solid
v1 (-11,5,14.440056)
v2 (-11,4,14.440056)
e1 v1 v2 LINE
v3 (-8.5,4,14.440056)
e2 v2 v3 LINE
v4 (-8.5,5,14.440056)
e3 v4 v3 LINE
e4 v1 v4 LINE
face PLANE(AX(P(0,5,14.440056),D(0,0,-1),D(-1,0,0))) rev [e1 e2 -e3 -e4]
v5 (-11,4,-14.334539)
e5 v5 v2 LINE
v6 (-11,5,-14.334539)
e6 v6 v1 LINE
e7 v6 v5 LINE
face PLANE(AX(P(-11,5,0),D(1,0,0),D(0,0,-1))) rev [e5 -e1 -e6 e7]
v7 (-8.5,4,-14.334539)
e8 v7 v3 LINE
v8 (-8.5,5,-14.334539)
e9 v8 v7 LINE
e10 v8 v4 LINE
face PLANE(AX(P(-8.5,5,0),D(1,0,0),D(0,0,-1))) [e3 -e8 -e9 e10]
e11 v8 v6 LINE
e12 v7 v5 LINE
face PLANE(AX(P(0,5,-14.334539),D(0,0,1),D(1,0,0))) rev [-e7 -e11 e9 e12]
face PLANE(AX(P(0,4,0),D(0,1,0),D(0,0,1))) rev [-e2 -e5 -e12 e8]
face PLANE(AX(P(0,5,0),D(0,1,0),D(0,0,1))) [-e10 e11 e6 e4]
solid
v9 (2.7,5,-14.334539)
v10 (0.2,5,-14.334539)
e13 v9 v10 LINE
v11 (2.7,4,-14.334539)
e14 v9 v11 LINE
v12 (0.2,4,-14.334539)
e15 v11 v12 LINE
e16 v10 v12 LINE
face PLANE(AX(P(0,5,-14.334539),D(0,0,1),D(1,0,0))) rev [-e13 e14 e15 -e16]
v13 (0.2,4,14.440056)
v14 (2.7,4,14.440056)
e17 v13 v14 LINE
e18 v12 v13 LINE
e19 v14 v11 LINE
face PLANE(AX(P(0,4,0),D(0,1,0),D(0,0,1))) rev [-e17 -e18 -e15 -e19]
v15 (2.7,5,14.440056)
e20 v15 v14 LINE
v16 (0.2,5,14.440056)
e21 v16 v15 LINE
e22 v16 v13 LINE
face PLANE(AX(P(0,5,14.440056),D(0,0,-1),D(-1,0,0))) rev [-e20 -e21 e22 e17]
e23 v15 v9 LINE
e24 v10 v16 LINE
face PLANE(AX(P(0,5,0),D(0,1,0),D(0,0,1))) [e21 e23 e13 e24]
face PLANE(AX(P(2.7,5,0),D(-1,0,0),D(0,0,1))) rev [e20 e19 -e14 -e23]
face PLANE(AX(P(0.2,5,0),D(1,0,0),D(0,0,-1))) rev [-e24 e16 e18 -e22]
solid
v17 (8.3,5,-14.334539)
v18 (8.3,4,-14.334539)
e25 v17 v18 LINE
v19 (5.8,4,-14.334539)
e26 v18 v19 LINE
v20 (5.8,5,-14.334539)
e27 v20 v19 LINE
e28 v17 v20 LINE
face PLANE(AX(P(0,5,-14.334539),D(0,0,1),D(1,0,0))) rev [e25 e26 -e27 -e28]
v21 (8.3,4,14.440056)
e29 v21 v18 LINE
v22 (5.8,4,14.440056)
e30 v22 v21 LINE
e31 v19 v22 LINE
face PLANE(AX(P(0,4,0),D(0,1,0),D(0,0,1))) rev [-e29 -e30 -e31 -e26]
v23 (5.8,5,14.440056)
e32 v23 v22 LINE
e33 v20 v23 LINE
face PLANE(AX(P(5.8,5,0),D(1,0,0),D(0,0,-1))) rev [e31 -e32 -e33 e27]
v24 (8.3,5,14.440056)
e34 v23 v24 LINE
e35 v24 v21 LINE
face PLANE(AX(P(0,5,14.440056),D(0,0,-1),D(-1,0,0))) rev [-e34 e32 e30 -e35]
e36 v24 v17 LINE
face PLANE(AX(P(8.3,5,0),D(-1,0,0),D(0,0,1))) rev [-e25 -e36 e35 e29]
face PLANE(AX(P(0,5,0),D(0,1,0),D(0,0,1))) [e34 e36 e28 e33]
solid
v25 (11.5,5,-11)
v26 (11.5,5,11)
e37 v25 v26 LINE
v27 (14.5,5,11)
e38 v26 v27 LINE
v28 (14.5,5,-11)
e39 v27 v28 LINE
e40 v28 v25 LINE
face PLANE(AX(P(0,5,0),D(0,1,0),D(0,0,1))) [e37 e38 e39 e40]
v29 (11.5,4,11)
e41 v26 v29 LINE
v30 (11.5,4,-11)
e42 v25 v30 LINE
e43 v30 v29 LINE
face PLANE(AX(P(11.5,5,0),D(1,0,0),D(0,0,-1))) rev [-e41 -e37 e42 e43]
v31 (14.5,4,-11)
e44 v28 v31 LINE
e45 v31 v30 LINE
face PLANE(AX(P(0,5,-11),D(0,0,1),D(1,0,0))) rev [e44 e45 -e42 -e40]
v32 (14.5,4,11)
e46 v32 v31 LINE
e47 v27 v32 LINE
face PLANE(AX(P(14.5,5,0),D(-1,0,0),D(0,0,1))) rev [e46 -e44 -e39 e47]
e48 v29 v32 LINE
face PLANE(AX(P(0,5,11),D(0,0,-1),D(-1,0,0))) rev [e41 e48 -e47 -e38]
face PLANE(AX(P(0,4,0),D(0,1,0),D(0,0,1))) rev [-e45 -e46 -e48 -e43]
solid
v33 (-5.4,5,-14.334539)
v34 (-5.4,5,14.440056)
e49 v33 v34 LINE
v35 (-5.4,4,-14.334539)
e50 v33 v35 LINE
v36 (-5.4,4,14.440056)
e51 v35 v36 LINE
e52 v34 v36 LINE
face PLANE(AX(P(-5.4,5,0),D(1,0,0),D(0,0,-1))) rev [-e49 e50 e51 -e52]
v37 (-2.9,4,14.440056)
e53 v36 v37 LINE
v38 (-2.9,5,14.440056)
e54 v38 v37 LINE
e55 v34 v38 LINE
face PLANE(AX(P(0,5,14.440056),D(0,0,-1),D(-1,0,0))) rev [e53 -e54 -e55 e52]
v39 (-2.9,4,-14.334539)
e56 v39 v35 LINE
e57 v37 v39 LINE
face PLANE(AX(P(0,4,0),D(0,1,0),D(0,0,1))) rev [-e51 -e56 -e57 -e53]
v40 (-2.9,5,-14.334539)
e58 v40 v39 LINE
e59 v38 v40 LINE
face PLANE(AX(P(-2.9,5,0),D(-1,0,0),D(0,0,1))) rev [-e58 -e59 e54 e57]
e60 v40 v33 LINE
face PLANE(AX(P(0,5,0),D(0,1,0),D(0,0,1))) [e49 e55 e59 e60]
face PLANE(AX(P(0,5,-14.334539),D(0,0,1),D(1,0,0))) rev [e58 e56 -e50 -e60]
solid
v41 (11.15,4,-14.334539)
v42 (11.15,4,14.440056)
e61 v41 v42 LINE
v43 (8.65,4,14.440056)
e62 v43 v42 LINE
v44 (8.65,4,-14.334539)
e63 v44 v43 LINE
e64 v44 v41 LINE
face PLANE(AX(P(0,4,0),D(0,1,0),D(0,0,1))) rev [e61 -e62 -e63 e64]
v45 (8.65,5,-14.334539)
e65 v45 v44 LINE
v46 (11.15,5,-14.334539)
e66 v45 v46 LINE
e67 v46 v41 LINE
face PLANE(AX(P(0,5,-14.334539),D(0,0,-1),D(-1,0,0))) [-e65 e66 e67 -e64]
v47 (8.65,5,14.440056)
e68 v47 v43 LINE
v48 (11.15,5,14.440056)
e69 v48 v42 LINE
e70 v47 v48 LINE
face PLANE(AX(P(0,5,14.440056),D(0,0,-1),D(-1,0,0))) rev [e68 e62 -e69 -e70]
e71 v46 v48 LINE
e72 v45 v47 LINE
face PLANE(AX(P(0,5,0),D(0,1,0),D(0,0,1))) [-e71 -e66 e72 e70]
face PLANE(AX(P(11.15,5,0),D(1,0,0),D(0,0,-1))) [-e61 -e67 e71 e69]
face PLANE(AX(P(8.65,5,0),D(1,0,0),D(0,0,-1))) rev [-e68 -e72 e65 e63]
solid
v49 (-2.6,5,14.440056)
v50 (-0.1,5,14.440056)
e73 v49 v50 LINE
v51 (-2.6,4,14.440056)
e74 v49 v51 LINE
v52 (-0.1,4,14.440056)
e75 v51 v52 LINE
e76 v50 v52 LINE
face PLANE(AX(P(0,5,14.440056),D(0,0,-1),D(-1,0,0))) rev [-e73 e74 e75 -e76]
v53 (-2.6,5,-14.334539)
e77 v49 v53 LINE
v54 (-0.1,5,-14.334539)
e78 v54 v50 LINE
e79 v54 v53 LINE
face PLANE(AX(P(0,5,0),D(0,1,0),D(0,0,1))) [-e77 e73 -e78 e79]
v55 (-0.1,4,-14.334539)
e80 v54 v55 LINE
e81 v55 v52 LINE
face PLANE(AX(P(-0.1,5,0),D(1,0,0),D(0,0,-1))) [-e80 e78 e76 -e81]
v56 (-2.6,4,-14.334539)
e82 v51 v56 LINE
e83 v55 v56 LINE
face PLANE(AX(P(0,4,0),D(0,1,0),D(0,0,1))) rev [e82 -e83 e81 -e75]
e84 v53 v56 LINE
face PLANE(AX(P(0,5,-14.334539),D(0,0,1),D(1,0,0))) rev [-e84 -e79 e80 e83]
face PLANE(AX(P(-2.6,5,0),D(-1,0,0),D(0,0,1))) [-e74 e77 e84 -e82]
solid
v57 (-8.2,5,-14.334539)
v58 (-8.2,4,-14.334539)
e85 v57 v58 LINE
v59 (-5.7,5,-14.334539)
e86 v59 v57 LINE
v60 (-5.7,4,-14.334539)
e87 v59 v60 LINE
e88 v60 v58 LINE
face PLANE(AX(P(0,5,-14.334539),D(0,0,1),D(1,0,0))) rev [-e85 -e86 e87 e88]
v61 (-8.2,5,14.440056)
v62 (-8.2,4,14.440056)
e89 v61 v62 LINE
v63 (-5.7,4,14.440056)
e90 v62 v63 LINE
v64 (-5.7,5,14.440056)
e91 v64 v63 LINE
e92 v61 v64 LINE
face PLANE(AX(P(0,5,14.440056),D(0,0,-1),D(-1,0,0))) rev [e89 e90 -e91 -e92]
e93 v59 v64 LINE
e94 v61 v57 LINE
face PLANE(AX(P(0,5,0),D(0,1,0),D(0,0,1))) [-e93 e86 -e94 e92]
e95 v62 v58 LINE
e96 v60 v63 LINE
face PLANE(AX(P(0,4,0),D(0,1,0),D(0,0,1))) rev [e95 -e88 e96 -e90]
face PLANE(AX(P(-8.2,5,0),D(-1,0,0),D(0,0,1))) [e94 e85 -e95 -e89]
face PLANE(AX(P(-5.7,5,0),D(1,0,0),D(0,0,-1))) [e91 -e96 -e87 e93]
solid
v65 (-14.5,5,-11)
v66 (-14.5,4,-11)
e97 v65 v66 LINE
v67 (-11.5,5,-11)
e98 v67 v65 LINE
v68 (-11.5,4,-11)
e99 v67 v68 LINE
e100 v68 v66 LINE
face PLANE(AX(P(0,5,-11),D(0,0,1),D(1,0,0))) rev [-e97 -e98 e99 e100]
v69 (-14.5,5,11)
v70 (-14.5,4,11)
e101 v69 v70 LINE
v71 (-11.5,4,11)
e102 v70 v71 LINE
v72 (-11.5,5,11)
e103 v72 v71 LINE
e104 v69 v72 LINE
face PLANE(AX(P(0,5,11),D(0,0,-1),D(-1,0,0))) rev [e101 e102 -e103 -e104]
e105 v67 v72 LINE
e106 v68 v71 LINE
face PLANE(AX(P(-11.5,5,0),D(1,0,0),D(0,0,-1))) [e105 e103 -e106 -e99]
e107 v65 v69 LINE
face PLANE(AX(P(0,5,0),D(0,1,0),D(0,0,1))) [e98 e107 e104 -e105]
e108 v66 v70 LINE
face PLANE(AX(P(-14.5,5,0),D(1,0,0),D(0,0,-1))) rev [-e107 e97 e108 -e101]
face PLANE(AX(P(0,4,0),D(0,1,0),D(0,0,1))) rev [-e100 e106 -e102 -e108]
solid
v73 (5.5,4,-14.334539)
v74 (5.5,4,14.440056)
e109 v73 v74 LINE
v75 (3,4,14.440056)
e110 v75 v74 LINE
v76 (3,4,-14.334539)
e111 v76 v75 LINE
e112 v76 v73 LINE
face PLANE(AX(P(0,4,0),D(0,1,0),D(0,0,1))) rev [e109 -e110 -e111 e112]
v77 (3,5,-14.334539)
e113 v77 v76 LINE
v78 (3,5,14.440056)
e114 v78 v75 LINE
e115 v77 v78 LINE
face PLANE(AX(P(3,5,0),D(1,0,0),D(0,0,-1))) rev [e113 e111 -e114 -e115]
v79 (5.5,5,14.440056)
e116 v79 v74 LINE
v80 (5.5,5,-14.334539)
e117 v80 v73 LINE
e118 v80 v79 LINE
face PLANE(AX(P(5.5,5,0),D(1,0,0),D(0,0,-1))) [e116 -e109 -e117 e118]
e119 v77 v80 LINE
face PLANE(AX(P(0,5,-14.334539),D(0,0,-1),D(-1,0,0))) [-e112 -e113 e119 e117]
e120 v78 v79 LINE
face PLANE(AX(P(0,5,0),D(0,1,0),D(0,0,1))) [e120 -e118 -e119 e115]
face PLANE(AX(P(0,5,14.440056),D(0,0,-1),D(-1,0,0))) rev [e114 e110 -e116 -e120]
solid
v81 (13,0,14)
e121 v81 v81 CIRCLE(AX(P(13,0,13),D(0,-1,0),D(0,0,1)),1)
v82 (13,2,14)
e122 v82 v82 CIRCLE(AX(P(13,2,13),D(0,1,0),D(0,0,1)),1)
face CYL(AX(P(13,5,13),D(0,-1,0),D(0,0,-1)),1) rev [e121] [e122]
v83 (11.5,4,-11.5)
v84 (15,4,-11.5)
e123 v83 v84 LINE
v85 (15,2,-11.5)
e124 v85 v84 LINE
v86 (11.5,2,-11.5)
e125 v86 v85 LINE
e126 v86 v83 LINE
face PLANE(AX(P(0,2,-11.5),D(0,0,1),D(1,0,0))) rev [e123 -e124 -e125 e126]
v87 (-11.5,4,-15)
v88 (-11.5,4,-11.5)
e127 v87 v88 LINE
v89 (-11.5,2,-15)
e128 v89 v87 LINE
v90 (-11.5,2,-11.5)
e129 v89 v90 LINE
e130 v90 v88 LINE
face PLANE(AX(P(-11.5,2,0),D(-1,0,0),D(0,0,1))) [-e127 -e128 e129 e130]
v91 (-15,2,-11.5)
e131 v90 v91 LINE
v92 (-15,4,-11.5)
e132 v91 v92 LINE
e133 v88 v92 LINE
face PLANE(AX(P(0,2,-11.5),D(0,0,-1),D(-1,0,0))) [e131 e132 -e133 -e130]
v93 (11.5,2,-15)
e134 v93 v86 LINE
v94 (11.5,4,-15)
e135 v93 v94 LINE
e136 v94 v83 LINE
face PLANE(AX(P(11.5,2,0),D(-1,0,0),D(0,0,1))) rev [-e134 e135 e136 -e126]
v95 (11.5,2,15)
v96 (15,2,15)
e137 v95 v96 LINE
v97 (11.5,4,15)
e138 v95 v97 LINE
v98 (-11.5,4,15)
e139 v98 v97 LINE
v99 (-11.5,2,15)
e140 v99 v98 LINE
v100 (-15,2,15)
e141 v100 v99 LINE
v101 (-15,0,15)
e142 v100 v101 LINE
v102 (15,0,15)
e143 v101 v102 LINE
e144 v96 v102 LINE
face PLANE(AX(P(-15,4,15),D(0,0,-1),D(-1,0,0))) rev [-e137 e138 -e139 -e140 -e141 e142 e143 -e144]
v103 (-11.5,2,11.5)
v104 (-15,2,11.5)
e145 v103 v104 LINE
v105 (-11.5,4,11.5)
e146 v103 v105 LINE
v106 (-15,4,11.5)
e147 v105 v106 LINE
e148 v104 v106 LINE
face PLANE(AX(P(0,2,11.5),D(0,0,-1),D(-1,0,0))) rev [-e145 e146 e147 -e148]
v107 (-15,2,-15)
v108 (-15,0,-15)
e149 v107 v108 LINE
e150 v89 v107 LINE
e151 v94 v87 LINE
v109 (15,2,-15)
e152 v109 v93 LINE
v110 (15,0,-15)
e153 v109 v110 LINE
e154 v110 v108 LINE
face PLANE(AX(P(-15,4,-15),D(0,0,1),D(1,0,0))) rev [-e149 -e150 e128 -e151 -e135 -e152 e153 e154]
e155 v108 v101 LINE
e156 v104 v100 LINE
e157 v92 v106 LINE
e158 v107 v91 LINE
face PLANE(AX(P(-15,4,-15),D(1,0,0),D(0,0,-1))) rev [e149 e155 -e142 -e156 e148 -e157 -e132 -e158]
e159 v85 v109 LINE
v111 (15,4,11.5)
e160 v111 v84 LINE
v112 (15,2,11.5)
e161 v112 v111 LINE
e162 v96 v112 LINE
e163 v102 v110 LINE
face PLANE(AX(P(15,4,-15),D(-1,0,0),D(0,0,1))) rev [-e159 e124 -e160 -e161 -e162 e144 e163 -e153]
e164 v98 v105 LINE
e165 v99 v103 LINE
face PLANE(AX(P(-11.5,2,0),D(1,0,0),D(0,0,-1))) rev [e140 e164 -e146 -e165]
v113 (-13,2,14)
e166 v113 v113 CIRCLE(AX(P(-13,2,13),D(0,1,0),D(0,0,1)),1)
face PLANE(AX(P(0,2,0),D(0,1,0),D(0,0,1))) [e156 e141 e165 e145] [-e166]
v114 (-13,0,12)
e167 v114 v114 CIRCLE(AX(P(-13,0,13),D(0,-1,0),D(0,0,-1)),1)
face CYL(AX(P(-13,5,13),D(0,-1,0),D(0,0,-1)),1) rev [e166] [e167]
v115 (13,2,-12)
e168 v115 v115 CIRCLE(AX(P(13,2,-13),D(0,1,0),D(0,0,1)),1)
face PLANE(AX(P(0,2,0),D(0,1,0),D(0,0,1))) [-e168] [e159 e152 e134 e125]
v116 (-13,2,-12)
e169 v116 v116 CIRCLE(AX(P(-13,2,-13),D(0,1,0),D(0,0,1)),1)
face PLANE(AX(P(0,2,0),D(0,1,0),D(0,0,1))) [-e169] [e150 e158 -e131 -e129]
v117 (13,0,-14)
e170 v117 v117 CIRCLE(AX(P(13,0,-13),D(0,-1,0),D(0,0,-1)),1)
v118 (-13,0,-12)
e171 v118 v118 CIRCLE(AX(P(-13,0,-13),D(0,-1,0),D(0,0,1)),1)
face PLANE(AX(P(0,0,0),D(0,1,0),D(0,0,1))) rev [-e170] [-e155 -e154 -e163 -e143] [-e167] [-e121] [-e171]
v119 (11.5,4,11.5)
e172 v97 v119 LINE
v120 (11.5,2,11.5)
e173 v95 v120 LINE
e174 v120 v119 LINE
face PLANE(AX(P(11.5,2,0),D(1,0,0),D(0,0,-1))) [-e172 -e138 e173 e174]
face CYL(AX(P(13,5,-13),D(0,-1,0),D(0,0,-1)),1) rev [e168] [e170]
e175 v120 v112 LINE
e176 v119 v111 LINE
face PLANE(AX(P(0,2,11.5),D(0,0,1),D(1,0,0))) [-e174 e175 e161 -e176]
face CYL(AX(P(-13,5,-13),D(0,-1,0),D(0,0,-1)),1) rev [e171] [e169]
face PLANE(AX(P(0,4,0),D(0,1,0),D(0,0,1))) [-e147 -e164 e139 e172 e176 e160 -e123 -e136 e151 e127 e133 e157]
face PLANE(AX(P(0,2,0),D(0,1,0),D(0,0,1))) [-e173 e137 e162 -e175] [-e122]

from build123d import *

# Parameters (mm, degrees)
SKETCH1_W                   = 30
SKETCH1_H                   = 30
BOSS_EXTRUDE1_DEPTH         = 4
CUT_EXTRUDE_THIN2_START     = -2
CUT_EXTRUDE_THIN2_OUTLINE_W = 3.5
CUT_EXTRUDE_THIN2_OUTLINE_H = 3.5
CUT_EXTRUDE_THIN2_DEPTH     = 2
SKETCH6_W                   = 3
SKETCH6_H                   = 22
BOSS_EXTRUDE2_DEPTH         = 1
SKETCH6_W_2                 = 2.5
SKETCH6_H_2                 = 28.774594564
BOSS_EXTRUDE2_2_DEPTH       = 1
BOSS_EXTRUDE2_3_DEPTH       = 1
BOSS_EXTRUDE2_4_DEPTH       = 1
BOSS_EXTRUDE2_5_DEPTH       = 1
BOSS_EXTRUDE2_6_DEPTH       = 1
BOSS_EXTRUDE2_7_DEPTH       = 1
BOSS_EXTRUDE2_8_DEPTH       = 1
BOSS_EXTRUDE2_9_DEPTH       = 1
BOSS_EXTRUDE2_10_DEPTH      = 1
SKETCH7_R                   = 1
CUT_EXTRUDE1_DEPTH          = 22.794494718


# Read off the part's stored shape, not the designer's step: Cut-Extrude-Thin2
with BuildPart() as part:
    # Sketch1 → Boss-Extrude1 (new body)
    with BuildSketch(Plane(origin=(0, 0, 0), x_dir=(1, 0, 0), z_dir=(0, 1, 0))):
        Rectangle(SKETCH1_W, SKETCH1_H)
    extrude(amount=BOSS_EXTRUDE1_DEPTH)

    # Cut-Extrude-Thin2 outline → Cut-Extrude-Thin2 (cut)
    with BuildSketch(Plane(origin=(0, 4, 0), x_dir=(1, 0, 0), z_dir=(0, 1, 0)).offset(CUT_EXTRUDE_THIN2_START)):
        with Locations((-13.25, -13.25)):
            Rectangle(CUT_EXTRUDE_THIN2_OUTLINE_W, CUT_EXTRUDE_THIN2_OUTLINE_H)
        with Locations((13.25, -13.25)):
            Rectangle(CUT_EXTRUDE_THIN2_OUTLINE_W, CUT_EXTRUDE_THIN2_OUTLINE_H)
        with Locations((-13.25, 13.25)):
            Rectangle(CUT_EXTRUDE_THIN2_OUTLINE_W, CUT_EXTRUDE_THIN2_OUTLINE_H)
        with Locations((13.25, 13.25)):
            Rectangle(CUT_EXTRUDE_THIN2_OUTLINE_W, CUT_EXTRUDE_THIN2_OUTLINE_H)
    extrude(amount=CUT_EXTRUDE_THIN2_DEPTH, mode=Mode.SUBTRACT)

    # Sketch7 → Cut-Extrude1 (cut, through all)
    with BuildSketch(Plane.XZ):
        with Locations(Location((-13, 13, 0), (0, 0, 270))):
            Circle(SKETCH7_R)
        with Locations(Location((13, 13, 0), (0, 0, 90))):
            Circle(SKETCH7_R)
        with Locations(Location((13, -13, 0), (0, 0, 270))):
            Circle(SKETCH7_R)
        with Locations(Location((-13, -13, 0), (0, 0, 90))):
            Circle(SKETCH7_R)
    extrude(amount=-CUT_EXTRUDE1_DEPTH, mode=Mode.SUBTRACT)


with BuildPart() as body_2:
    # Sketch6 → Boss-Extrude2 (new body)
    with BuildSketch(Plane(origin=(0, 4, 0), x_dir=(1, 0, 0), z_dir=(0, 1, 0))):
        with Locations((-13, 0)):
            Rectangle(SKETCH6_W, SKETCH6_H)
    extrude(amount=BOSS_EXTRUDE2_DEPTH)


with BuildPart() as body_3:
    # Sketch6 → Boss-Extrude2 2 (new body)
    with BuildSketch(Plane(origin=(0, 4, 0), x_dir=(1, 0, 0), z_dir=(0, 1, 0))):
        with Locations((-9.75, -0.052758691)):
            Rectangle(SKETCH6_W_2, SKETCH6_H_2)
    extrude(amount=BOSS_EXTRUDE2_2_DEPTH)


with BuildPart() as body_4:
    # Sketch6 → Boss-Extrude2 3 (new body)
    with BuildSketch(Plane(origin=(0, 4, 0), x_dir=(1, 0, 0), z_dir=(0, 1, 0))):
        with Locations((-6.95, -0.052758691)):
            Rectangle(SKETCH6_W_2, SKETCH6_H_2)
    extrude(amount=BOSS_EXTRUDE2_3_DEPTH)


with BuildPart() as body_5:
    # Sketch6 → Boss-Extrude2 4 (new body)
    with BuildSketch(Plane(origin=(0, 4, 0), x_dir=(1, 0, 0), z_dir=(0, 1, 0))):
        with Locations((-4.15, -0.052758691)):
            Rectangle(SKETCH6_W_2, SKETCH6_H_2)
    extrude(amount=BOSS_EXTRUDE2_4_DEPTH)


with BuildPart() as body_6:
    # Sketch6 → Boss-Extrude2 5 (new body)
    with BuildSketch(Plane(origin=(0, 4, 0), x_dir=(1, 0, 0), z_dir=(0, 1, 0))):
        with Locations((-1.35, -0.052758691)):
            Rectangle(SKETCH6_W_2, SKETCH6_H_2)
    extrude(amount=BOSS_EXTRUDE2_5_DEPTH)


with BuildPart() as body_7:
    # Sketch6 → Boss-Extrude2 6 (new body)
    with BuildSketch(Plane(origin=(0, 4, 0), x_dir=(1, 0, 0), z_dir=(0, 1, 0))):
        with Locations((1.45, -0.052758691)):
            Rectangle(SKETCH6_W_2, SKETCH6_H_2)
    extrude(amount=BOSS_EXTRUDE2_6_DEPTH)


with BuildPart() as body_8:
    # Sketch6 → Boss-Extrude2 7 (new body)
    with BuildSketch(Plane(origin=(0, 4, 0), x_dir=(1, 0, 0), z_dir=(0, 1, 0))):
        with Locations((4.25, -0.052758691)):
            Rectangle(SKETCH6_W_2, SKETCH6_H_2)
    extrude(amount=BOSS_EXTRUDE2_7_DEPTH)


with BuildPart() as body_9:
    # Sketch6 → Boss-Extrude2 8 (new body)
    with BuildSketch(Plane(origin=(0, 4, 0), x_dir=(1, 0, 0), z_dir=(0, 1, 0))):
        Polygon((8.3, -14.440055973), (8.3, 14.334538591), (7.713421102, 14.334538591), (5.8, 14.334538591), (5.8, -14.440055973), (7.713421102, -14.440055973), align=None)
    extrude(amount=BOSS_EXTRUDE2_8_DEPTH)


with BuildPart() as body_10:
    # Sketch6 → Boss-Extrude2 9 (new body)
    with BuildSketch(Plane(origin=(0, 4, 0), x_dir=(1, 0, 0), z_dir=(0, 1, 0))):
        Polygon((10.88715437, 14.334538591), (8.65, 14.334538591), (8.65, -14.440055973), (11.15, -14.440055973), (11.15, 14.334538591), align=None)
    extrude(amount=BOSS_EXTRUDE2_9_DEPTH)


with BuildPart() as body_11:
    # Sketch6 → Boss-Extrude2 10 (new body)
    with BuildSketch(Plane(origin=(0, 4, 0), x_dir=(1, 0, 0), z_dir=(0, 1, 0))):
        with Locations((13, 0)):
            Rectangle(SKETCH6_W, SKETCH6_H)
    extrude(amount=BOSS_EXTRUDE2_10_DEPTH)


solid = Compound([part.part, body_2.part, body_3.part, body_4.part, body_5.part, body_6.part, body_7.part, body_8.part, body_9.part, body_10.part, body_11.part])
